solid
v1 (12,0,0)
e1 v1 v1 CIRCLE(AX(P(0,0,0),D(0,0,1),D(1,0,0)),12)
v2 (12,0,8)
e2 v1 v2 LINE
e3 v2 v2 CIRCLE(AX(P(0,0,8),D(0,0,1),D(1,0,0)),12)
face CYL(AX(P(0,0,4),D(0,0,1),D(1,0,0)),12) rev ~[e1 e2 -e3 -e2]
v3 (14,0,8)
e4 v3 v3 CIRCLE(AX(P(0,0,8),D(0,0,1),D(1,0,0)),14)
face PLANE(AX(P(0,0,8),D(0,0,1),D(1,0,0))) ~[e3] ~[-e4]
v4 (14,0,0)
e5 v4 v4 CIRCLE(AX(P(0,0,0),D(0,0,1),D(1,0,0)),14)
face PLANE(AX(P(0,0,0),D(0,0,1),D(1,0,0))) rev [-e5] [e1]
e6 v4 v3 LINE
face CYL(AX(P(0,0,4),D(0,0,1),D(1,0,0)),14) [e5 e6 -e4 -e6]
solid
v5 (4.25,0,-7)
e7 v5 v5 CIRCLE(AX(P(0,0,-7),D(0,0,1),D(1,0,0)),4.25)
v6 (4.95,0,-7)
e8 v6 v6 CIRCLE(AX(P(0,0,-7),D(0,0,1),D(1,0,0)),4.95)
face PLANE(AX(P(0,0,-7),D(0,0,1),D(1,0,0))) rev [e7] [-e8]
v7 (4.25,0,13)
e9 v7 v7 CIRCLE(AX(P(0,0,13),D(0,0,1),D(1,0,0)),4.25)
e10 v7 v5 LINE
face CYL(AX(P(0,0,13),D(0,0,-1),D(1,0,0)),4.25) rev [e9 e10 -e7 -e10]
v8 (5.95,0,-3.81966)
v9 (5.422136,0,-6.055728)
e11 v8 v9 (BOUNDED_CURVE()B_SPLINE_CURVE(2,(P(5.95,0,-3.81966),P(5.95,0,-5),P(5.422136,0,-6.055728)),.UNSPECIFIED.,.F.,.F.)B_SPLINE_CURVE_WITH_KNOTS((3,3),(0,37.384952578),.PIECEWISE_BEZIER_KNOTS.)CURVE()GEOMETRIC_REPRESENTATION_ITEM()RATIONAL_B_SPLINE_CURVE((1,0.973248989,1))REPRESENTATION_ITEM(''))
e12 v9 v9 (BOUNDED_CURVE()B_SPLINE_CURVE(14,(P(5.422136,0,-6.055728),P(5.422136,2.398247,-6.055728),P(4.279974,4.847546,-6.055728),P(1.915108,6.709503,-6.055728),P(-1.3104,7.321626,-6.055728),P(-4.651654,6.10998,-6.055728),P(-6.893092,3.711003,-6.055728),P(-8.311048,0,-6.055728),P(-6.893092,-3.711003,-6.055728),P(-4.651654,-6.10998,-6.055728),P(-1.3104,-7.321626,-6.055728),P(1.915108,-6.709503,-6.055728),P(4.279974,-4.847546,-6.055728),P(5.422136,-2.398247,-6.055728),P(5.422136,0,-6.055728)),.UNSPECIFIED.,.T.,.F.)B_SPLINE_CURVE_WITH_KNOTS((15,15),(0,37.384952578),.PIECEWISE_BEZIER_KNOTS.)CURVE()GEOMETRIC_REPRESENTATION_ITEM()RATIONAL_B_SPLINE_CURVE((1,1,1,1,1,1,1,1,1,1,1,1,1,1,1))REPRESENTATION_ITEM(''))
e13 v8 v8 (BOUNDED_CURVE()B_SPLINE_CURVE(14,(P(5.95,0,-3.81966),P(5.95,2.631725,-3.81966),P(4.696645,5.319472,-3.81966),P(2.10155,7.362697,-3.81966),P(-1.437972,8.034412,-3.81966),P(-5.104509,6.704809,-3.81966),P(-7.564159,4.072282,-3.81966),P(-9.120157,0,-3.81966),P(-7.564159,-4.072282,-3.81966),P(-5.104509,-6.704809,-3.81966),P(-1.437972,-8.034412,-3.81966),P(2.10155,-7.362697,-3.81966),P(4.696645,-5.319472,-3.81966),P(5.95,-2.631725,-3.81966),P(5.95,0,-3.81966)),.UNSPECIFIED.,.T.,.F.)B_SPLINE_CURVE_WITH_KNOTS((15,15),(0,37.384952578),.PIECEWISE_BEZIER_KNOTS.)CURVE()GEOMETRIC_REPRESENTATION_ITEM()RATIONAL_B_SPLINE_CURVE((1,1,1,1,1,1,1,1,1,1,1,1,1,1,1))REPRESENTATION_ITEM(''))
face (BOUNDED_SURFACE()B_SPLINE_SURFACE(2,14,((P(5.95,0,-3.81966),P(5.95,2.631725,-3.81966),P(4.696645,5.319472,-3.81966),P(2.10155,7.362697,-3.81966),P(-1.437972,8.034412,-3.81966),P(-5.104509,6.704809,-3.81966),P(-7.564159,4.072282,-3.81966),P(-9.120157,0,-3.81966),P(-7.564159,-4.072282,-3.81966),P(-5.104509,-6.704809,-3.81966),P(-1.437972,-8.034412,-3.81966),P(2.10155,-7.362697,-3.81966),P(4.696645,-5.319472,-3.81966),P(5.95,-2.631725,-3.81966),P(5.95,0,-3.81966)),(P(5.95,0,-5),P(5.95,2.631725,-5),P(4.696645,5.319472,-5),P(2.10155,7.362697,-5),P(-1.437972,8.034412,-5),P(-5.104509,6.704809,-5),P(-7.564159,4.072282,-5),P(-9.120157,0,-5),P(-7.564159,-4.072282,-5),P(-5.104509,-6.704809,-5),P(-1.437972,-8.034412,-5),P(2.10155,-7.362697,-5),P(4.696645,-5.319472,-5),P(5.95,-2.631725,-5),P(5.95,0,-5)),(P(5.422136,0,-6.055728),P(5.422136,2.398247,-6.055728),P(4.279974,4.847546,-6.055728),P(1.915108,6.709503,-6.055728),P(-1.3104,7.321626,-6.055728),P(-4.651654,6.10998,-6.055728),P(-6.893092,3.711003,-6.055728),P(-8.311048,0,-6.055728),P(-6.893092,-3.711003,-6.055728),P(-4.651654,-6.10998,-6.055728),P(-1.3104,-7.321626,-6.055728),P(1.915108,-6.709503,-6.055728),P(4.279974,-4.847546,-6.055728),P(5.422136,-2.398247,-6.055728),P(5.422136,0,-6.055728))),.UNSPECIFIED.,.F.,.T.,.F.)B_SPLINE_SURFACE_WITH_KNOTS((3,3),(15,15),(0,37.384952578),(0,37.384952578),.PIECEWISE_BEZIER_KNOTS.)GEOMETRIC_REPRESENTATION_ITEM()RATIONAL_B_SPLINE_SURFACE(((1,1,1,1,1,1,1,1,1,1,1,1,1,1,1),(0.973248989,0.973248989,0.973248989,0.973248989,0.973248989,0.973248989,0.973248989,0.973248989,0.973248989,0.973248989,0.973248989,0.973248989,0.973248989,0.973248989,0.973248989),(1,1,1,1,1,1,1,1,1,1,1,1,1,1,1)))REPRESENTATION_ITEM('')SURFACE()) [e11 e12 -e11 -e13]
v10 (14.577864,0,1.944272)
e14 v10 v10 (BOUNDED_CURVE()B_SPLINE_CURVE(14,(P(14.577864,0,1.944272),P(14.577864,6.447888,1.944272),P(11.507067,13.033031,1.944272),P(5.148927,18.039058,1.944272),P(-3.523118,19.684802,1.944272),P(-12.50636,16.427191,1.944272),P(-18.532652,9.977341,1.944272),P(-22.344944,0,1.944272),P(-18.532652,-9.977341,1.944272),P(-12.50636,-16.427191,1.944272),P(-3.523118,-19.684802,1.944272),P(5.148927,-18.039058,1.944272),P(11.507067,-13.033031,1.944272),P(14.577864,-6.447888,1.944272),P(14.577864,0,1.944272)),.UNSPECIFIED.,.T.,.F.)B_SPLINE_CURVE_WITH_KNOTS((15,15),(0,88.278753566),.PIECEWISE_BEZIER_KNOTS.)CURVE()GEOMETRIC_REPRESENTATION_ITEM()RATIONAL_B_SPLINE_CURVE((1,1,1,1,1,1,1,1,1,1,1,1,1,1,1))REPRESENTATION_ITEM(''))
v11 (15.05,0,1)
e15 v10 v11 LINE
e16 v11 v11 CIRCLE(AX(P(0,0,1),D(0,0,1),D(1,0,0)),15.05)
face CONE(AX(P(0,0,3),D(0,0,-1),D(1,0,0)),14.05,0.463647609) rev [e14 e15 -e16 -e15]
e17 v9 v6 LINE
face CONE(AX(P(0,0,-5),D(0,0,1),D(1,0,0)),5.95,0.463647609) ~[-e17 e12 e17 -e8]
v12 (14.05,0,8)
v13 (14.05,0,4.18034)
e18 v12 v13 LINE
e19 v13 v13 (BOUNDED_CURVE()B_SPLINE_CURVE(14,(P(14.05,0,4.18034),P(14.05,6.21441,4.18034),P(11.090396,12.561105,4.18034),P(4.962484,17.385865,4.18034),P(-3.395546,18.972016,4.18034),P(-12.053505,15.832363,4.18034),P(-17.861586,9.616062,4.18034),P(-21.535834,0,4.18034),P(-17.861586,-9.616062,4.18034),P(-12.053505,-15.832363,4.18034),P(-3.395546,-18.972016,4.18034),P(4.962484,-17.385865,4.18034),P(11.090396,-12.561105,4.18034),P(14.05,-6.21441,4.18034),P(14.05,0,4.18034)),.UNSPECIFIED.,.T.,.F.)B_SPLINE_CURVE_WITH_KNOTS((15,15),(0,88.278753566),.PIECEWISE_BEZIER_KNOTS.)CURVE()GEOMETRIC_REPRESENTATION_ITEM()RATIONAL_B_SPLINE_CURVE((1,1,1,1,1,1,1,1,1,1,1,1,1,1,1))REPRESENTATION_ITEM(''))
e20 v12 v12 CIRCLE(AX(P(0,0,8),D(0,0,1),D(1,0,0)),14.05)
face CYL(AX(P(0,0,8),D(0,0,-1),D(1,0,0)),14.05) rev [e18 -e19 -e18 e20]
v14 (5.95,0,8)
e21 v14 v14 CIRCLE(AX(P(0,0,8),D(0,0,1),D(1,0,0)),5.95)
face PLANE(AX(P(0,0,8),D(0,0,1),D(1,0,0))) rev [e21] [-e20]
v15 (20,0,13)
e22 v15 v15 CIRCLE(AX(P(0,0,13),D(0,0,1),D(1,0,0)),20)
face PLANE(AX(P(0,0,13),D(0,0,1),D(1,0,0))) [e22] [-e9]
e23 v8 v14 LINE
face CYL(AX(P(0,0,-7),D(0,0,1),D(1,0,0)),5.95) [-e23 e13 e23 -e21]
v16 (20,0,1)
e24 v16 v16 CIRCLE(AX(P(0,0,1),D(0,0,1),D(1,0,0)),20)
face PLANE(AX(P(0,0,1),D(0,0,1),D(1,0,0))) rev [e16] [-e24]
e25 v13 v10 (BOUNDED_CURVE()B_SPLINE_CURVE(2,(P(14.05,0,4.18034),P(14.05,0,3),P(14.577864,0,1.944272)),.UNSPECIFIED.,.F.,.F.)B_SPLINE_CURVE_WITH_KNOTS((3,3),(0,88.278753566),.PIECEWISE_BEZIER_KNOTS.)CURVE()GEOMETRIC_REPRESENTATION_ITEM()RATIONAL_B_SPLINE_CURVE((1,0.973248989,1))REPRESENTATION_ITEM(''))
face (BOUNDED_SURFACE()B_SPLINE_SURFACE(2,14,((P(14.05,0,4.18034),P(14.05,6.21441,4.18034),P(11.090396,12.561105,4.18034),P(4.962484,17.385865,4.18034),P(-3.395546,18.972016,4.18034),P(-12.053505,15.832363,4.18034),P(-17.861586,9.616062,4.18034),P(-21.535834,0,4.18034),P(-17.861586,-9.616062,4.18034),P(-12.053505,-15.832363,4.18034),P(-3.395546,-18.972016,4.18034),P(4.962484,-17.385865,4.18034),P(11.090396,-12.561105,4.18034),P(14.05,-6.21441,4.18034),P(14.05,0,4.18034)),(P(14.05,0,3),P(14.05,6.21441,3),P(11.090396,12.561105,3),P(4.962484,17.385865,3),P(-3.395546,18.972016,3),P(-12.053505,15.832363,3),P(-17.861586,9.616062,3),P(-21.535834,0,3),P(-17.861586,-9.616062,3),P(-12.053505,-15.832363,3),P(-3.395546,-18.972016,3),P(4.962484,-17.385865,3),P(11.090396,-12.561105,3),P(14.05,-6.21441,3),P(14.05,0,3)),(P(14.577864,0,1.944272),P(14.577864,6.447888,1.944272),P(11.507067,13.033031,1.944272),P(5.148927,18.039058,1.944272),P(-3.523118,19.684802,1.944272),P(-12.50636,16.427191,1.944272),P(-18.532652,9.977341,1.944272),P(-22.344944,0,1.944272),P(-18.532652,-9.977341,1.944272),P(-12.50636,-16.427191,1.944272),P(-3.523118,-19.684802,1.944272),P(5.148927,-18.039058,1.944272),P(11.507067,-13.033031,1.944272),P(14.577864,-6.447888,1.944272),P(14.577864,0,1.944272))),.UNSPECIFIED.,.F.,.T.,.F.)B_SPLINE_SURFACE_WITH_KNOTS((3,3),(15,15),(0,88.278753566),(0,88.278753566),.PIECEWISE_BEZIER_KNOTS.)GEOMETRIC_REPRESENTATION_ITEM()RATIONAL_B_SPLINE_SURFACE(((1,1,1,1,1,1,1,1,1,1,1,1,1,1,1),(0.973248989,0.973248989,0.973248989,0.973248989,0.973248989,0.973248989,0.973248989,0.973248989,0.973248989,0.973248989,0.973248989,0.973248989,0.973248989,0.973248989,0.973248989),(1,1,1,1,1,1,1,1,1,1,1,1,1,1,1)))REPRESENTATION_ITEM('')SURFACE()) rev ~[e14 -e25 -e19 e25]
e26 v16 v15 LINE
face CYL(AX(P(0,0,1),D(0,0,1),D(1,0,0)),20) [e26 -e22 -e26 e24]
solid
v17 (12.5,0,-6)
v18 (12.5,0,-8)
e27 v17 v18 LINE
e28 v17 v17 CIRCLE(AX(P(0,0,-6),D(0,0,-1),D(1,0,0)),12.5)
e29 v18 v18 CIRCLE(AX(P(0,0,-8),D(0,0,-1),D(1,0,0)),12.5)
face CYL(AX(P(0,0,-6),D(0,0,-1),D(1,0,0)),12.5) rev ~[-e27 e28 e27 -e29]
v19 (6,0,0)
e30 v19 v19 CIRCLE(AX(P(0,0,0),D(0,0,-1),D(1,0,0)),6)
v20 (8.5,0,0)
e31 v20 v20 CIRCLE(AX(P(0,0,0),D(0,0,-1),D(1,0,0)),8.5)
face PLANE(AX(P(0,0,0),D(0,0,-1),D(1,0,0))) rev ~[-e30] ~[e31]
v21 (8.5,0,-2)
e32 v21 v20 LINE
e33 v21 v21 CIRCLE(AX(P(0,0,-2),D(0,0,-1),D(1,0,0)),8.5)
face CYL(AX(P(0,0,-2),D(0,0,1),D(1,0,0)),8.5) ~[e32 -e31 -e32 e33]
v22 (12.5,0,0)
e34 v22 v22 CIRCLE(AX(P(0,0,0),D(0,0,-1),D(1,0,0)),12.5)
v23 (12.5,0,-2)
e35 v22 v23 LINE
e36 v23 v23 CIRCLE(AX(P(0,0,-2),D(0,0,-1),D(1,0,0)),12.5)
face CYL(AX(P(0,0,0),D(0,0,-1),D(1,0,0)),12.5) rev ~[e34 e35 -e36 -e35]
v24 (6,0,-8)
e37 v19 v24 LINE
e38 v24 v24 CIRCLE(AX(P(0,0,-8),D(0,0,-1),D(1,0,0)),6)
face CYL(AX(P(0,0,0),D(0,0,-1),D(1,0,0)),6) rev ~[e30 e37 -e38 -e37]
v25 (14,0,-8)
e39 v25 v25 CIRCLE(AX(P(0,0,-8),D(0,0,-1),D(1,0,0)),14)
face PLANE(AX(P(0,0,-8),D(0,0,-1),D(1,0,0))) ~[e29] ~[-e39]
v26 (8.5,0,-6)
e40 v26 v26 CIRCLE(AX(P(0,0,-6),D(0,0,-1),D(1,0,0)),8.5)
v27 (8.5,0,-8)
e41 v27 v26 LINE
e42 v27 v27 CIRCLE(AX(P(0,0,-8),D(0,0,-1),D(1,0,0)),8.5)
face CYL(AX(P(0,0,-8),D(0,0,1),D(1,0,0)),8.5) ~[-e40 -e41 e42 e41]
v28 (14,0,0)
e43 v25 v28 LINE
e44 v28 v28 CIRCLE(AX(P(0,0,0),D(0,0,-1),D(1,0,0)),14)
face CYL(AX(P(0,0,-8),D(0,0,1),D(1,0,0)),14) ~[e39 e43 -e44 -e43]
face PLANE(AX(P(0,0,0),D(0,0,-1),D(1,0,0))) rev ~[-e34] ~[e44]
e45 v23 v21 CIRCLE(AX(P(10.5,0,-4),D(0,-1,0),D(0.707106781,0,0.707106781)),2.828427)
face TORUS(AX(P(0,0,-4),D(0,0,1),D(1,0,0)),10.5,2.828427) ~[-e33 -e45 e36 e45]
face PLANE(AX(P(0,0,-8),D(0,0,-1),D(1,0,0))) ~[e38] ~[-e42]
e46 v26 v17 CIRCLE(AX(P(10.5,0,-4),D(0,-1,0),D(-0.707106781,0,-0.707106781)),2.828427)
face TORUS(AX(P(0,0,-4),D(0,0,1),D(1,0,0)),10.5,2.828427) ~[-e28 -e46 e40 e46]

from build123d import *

# Parameters (mm, degrees)
F0_W     = 2
F0_H     = 8
F6_SIZE2 = 1
F6_SIZE  = 2
F7_SIZE2 = 1
F7_SIZE  = 2
F8_R     = 5


with BuildPart() as f1:
    # F0 (on Front) → F1 (revolve)
    with BuildSketch(Plane.XZ):
        with Locations((13, 4)):
            Rectangle(F0_W, F0_H)
    revolve(axis=Axis((0, 0, 16.0184632987), (0, 0, 1)))


with BuildPart() as f3:
    # F2 (on Front) → F3 (revolve)
    with BuildSketch(Plane.XZ):
        Polygon((14.05, 8), (14.05, 1), (20, 1), (20, 13), (4.25, 13), (4.25, -7), (5.95, -7), (5.95, 8), align=None)
    revolve(axis=Axis((0, 0, 8.1785988285), (0, 0, 1)))

    # F6
    f6_edges = [f3.edges().sort_by_distance(p)[0] for p in [
        (-14.05, 0, 1),
    ]]
    chamfer(f6_edges, length=F6_SIZE, length2=F6_SIZE2)

    # F7
    f7_edges = [f3.edges().sort_by_distance(p)[0] for p in [
        (-5.95, 0, -7),
    ]]
    f7_side = f3.faces().sort_by_distance((-5.95, 0, 0.5))[0]
    chamfer(f7_edges, length=F7_SIZE, length2=F7_SIZE2, reference=f7_side)

    # F8
    f8_edges = [f3.edges().sort_by_distance(p)[0] for p in [
        (-14.05, 0, 3),
        (-5.95, 0, -5),
    ]]
    fillet(f8_edges, radius=F8_R)


with BuildPart() as f5:
    # F4 (on Front) → F5 (revolve)
    with BuildSketch(Plane.XZ):
        with BuildLine():
            Line((14, -8), (14, 0))
            Line((14, 0), (12.5, 0))
            Line((12.5, 0), (12.5, -2))
            ThreePointArc((12.5, -2), (10.5, -1.1715728753), (8.5, -2))
            Line((8.5, -2), (8.5, 0))
            Line((8.5, 0), (6, 0))
            Line((6, 0), (6, -8))
            Line((6, -8), (8.5, -8))
            Line((8.5, -8), (8.5, -6))
            ThreePointArc((8.5, -6), (10.5, -6.8284271247), (12.5, -6))
            Line((12.5, -6), (12.5, -8))
            Line((12.5, -8), (14, -8))
        make_face()
    revolve(axis=Axis((0, 0, -10.4025015607), (0, 0, -1)))


solid = Compound([f1.part, f3.part, f5.part])
